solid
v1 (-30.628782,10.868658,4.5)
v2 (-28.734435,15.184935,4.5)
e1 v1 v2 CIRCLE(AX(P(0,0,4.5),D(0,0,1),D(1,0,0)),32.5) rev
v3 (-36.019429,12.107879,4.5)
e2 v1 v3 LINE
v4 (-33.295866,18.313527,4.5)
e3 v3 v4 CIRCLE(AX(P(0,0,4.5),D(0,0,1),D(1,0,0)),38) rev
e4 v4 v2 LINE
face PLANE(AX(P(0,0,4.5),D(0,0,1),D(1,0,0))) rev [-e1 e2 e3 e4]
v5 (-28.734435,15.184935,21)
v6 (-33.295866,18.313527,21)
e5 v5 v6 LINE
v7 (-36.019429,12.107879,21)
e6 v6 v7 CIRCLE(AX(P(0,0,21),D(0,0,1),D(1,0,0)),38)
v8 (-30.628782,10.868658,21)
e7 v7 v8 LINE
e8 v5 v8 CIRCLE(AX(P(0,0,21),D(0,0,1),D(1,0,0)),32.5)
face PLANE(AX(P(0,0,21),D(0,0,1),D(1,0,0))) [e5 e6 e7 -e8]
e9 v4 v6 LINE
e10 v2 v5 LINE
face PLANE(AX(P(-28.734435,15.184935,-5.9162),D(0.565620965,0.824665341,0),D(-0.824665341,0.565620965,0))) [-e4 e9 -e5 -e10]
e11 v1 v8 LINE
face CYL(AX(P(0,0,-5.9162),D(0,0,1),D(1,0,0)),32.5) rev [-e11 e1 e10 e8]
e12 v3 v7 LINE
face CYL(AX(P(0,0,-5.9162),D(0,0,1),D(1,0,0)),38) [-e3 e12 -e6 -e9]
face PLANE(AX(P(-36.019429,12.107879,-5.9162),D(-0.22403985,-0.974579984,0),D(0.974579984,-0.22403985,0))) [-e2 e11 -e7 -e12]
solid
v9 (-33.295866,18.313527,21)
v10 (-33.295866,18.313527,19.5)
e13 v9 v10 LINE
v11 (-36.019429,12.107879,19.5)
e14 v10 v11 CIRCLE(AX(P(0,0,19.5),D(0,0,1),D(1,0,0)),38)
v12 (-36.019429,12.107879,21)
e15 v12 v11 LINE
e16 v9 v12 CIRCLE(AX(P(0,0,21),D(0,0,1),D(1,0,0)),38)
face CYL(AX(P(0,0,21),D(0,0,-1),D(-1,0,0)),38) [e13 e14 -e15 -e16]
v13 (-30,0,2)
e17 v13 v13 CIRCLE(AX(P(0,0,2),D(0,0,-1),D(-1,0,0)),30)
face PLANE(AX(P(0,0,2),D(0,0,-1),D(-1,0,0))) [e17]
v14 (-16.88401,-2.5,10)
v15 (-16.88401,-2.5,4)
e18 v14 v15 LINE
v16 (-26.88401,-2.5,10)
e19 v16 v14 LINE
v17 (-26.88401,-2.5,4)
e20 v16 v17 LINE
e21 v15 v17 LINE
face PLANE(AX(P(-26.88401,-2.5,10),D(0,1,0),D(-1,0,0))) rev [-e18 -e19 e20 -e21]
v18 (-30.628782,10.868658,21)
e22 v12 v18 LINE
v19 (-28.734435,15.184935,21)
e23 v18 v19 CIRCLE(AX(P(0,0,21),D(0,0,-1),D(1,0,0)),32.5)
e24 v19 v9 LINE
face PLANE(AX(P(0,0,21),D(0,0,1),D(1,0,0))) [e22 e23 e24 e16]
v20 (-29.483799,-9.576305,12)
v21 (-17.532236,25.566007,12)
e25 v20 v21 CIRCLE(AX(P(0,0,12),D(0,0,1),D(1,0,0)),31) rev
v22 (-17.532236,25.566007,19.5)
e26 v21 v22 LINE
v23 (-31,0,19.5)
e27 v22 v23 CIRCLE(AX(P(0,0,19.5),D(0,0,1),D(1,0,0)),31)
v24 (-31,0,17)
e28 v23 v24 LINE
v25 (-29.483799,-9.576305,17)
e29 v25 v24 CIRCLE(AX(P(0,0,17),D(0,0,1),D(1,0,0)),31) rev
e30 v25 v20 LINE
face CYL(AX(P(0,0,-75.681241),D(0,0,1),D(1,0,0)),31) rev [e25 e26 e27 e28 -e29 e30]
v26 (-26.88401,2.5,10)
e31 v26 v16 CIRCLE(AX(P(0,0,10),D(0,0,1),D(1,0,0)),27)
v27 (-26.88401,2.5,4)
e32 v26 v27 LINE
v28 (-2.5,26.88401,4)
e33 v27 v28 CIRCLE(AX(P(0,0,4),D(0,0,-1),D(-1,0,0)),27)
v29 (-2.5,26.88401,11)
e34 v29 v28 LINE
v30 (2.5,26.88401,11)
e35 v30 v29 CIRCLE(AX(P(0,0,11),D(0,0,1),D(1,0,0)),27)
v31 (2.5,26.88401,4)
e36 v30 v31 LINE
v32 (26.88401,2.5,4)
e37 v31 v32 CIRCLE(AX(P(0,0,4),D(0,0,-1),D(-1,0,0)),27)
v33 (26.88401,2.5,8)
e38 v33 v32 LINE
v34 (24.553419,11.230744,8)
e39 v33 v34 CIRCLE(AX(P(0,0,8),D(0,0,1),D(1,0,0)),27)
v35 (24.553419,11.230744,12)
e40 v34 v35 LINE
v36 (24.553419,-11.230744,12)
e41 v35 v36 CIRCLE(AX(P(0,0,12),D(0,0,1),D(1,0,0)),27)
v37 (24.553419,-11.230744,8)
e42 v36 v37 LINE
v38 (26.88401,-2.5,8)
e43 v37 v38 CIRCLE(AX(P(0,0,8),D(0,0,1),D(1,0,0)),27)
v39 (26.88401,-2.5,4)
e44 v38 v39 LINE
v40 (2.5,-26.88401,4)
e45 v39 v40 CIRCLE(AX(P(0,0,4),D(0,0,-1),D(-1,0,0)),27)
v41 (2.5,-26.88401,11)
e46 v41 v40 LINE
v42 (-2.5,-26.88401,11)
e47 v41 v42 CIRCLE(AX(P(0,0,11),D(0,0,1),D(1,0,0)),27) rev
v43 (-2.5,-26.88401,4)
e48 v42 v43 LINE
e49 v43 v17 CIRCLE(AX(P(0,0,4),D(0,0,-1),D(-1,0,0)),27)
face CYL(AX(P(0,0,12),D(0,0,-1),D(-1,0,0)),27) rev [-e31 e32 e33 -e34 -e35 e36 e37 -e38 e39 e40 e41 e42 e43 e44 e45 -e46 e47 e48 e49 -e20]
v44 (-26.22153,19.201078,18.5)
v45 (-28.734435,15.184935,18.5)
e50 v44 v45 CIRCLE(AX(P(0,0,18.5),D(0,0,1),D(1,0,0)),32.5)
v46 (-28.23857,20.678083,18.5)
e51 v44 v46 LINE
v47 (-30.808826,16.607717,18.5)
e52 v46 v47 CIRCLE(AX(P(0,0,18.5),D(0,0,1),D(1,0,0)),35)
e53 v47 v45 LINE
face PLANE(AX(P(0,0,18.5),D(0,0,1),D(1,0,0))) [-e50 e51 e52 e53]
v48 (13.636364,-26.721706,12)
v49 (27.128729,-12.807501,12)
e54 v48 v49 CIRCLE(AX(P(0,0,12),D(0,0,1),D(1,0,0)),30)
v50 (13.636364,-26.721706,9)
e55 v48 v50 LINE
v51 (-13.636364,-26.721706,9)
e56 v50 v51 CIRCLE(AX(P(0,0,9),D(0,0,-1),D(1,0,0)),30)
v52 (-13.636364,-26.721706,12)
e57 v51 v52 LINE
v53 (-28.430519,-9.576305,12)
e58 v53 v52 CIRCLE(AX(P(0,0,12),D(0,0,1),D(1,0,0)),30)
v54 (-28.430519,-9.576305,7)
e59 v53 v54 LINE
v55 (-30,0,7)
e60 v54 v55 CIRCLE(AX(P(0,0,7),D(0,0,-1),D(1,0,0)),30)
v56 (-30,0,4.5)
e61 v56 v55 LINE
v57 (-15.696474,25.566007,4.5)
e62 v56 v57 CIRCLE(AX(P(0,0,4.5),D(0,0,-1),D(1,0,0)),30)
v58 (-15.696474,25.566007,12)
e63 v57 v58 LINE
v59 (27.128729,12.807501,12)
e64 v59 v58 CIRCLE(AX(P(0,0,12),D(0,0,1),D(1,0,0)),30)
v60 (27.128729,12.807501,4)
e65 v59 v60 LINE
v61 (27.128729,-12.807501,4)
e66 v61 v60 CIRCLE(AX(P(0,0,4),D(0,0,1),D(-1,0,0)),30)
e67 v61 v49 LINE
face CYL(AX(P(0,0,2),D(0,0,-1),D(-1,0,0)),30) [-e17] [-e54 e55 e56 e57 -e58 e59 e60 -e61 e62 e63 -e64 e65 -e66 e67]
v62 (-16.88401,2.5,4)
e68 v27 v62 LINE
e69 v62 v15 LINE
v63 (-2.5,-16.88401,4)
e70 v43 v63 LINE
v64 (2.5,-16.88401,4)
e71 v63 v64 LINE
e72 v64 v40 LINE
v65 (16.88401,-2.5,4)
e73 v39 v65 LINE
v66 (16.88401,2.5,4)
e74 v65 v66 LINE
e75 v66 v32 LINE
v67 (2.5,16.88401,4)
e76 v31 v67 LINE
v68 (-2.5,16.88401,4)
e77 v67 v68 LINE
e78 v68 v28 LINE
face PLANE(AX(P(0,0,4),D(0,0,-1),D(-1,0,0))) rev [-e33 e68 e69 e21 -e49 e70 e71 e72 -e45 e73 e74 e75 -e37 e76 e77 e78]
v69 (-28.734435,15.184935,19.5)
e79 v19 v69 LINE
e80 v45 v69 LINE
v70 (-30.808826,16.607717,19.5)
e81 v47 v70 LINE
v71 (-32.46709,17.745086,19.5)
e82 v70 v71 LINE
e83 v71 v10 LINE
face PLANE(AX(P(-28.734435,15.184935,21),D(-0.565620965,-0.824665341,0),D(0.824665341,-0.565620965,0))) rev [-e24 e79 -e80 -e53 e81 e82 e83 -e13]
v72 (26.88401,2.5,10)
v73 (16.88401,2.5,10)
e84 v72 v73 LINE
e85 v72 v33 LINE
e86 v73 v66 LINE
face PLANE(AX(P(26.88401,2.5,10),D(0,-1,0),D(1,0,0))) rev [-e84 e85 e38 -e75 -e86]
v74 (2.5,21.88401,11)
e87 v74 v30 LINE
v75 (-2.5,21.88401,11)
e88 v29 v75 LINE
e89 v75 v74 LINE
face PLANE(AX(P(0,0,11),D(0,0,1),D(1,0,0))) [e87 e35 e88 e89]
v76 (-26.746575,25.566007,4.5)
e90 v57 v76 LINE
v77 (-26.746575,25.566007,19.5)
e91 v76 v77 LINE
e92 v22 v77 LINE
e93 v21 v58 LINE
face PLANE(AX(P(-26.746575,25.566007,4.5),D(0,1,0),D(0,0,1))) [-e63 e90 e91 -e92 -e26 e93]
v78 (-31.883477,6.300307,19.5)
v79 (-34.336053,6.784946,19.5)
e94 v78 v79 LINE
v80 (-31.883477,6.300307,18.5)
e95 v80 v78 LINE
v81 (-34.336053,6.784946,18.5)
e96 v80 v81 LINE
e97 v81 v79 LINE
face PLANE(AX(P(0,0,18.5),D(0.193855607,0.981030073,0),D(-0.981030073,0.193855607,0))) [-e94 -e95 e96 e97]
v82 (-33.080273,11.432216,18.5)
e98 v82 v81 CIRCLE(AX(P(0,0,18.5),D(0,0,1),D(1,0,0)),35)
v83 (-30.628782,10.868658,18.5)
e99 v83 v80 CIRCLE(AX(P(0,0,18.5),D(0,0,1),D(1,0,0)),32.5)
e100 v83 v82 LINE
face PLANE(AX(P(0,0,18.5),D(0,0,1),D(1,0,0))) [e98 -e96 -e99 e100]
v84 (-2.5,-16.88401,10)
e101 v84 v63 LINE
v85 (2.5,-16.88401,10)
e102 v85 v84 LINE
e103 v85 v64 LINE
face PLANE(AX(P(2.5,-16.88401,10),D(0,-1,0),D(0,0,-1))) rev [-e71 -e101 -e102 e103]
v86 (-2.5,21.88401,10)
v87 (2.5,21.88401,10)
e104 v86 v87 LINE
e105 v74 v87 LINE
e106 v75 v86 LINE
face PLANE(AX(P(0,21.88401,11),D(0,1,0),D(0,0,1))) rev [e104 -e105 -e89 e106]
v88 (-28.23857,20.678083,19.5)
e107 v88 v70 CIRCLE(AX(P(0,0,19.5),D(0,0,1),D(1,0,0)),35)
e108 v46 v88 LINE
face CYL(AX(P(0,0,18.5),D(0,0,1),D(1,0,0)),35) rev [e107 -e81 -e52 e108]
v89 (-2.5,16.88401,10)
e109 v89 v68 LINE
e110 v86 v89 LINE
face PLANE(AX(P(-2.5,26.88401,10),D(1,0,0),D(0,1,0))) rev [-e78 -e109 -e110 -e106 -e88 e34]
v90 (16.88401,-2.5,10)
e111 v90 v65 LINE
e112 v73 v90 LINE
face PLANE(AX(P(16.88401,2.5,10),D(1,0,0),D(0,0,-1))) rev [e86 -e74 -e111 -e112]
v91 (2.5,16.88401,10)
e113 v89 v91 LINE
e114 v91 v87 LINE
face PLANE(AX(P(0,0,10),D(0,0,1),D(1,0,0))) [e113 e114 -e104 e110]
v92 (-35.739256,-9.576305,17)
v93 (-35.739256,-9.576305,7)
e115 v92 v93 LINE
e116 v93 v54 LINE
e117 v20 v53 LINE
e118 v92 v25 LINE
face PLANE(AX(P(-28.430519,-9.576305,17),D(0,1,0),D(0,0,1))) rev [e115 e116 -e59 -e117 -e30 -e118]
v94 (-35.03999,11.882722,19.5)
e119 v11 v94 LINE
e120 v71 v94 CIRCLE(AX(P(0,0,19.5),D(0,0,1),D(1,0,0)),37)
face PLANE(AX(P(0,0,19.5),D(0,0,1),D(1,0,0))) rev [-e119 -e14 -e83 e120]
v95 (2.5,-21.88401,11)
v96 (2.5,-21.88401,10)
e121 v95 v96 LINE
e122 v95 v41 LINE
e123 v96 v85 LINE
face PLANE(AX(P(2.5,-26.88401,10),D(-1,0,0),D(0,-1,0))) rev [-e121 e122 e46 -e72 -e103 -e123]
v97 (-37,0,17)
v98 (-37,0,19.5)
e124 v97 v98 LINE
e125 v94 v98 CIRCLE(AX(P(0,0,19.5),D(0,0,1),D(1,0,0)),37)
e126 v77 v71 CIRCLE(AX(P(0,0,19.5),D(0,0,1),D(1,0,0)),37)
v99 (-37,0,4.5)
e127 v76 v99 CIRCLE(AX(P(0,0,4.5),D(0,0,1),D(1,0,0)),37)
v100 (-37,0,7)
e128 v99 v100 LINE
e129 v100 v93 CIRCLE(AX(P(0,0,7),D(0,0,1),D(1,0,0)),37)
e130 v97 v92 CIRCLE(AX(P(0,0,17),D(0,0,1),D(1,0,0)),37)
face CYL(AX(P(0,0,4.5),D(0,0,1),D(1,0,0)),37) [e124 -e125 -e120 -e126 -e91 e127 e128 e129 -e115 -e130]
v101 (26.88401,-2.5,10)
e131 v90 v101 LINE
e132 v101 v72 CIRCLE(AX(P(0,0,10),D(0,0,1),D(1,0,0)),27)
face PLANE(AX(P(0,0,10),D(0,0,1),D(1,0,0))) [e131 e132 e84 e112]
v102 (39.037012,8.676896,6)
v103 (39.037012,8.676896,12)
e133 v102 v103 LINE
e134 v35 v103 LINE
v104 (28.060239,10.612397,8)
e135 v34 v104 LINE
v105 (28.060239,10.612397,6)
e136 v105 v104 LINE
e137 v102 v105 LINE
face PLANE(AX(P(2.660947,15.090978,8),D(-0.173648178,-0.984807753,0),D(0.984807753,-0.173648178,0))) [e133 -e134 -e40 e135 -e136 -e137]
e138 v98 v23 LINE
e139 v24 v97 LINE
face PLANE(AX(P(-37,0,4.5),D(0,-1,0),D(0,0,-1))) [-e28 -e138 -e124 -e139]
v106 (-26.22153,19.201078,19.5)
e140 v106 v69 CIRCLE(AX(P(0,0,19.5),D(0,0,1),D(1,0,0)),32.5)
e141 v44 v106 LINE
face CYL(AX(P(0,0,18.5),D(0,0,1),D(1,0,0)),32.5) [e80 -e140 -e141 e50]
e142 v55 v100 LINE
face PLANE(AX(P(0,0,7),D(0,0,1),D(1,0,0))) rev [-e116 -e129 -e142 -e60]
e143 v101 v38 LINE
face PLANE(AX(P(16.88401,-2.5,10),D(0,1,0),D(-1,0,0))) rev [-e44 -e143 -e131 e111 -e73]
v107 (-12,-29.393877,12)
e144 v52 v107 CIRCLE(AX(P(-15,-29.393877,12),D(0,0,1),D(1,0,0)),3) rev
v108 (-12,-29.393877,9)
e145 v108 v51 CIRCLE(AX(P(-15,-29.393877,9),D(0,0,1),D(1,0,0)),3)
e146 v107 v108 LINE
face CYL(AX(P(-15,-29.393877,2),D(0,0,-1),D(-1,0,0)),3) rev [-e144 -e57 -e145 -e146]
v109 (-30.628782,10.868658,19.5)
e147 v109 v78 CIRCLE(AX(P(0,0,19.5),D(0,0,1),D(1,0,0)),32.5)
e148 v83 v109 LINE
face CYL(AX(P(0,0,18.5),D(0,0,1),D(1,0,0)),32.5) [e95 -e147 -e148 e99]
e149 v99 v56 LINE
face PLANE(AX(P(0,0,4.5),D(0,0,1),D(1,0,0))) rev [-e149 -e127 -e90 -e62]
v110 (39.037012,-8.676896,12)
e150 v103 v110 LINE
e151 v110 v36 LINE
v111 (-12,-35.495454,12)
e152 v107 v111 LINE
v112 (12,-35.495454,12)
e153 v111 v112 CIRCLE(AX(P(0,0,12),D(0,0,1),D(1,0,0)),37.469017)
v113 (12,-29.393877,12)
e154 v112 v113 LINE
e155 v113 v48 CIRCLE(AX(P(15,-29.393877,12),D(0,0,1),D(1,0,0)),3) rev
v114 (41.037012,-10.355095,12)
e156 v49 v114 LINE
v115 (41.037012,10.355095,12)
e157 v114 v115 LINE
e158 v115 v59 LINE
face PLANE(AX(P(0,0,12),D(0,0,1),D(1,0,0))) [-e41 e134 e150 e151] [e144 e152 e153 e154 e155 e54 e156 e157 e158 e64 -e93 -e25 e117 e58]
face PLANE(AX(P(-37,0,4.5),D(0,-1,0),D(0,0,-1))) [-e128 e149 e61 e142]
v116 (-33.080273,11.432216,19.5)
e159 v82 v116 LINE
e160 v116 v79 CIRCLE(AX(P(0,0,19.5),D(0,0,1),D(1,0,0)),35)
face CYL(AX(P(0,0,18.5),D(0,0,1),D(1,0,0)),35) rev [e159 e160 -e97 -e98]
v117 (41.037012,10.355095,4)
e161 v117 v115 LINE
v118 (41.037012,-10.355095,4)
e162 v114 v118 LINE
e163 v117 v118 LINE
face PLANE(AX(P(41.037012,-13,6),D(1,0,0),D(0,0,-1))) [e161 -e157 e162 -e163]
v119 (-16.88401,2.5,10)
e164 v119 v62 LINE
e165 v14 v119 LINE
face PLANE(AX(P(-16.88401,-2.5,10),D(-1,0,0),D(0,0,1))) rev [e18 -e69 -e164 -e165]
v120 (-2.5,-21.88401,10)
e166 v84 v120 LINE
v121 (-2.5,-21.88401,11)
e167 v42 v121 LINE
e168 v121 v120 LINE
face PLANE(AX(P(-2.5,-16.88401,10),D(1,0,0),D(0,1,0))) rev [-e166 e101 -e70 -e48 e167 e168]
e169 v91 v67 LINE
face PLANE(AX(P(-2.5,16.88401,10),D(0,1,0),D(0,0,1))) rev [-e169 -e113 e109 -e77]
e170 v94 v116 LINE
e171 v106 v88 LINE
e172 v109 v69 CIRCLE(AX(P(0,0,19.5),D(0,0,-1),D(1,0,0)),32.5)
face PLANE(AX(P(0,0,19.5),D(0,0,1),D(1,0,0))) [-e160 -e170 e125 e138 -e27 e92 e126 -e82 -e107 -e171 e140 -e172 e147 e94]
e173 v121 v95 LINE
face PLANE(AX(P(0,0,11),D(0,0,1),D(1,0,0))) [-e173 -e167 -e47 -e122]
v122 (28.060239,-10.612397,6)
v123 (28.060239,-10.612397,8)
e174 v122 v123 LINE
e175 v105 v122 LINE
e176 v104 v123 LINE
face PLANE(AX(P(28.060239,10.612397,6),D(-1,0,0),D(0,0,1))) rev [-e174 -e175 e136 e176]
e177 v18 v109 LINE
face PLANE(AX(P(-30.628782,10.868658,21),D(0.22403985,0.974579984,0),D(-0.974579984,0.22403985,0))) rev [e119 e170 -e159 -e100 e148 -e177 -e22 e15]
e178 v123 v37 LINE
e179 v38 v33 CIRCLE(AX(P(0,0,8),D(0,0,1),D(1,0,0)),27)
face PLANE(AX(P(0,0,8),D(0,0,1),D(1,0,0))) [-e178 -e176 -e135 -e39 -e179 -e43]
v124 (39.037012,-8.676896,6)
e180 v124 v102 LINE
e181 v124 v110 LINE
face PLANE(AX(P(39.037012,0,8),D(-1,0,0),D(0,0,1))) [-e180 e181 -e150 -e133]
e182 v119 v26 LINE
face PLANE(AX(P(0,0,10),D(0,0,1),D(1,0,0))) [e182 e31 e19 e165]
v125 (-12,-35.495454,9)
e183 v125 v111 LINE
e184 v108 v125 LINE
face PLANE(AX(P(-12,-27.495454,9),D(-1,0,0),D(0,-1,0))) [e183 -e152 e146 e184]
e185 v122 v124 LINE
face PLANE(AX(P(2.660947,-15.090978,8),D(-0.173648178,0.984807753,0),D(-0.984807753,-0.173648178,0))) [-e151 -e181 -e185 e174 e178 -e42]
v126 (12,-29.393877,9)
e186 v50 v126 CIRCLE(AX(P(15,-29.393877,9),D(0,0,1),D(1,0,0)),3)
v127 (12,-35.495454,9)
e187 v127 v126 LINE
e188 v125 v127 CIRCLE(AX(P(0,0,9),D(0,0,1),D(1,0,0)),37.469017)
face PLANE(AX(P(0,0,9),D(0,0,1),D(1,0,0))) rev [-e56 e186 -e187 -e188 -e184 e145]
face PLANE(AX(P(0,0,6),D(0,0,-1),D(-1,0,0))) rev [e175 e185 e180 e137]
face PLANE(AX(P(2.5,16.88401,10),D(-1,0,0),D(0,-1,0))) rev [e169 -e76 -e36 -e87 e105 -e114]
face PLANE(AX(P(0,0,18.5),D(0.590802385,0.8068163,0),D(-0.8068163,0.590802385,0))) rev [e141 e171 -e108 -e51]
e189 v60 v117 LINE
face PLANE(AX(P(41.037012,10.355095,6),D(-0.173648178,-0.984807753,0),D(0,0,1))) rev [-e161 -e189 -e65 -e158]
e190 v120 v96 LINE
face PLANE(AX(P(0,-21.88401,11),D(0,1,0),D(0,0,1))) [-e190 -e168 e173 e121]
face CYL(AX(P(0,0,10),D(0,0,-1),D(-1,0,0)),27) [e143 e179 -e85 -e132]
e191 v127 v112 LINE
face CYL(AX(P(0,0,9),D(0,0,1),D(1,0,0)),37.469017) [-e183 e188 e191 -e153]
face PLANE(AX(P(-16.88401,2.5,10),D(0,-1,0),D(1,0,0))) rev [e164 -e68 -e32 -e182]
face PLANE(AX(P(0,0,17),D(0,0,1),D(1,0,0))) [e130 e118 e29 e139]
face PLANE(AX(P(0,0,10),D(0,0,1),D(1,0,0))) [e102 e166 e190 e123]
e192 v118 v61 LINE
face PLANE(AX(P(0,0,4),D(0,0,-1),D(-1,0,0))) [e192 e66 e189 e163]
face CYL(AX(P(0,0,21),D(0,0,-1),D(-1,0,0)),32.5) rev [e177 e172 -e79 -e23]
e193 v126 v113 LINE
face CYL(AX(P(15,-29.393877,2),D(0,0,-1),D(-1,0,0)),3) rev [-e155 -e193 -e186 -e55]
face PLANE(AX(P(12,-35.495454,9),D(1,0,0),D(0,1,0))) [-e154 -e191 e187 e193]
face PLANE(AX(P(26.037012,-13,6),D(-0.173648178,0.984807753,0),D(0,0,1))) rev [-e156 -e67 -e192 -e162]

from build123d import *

# Parameters (mm, degrees)
SKETCH_1_R           = 30
EXTRUDE_1_DEPTH      = 2
SKETCH_5_R           = 30
SKETCH_5_R_2         = 27
EXTRUDE_2_DEPTH      = 10
EXTRUDE_START        = -3
EXTRUDE_3_DEPTH      = 3
FILLET_2_R           = 3
FILLET_3_R           = 3
EXTRUDE_START_2      = -6
EXTRUDE_4_DEPTH      = 6
EXTRUDE_6_DEPTH      = 7.5
SKETCH_14_R          = 31
CUT_EXTRUDE_3_DEPTH  = 7.5
CHAMFER_4_SIZE       = 2.644904711
CHAMFER_4_SIZE_2     = 15
CHAMFER_5_SIZE       = 2.644904711
CHAMFER_5_SIZE_2     = 15
CUT_EXTRUDE_START    = -4
CUT_EXTRUDE_6_DEPTH  = 4
EXTRUDE_10_DEPTH     = 5
CUT_EXTRUDE_START_2  = 6
CUT_EXTRUDE_7_DEPTH  = 6
EXTRUDE_11_DEPTH     = 8
EXTRUDE_12_DEPTH     = 1
EXTRUDE_13_DEPTH     = 1.5
EXTRUDE_14_DEPTH     = 16.5
CUT_EXTRUDE_START_3  = -1
CUT_EXTRUDE_8_DEPTH  = 1
EXTRUDE_START_3      = 2
EXTRUDE_15_DEPTH     = 2
CUT_EXTRUDE_9_DEPTH  = 2
SKETCH_33_R          = 30
CUT_EXTRUDE_10_DEPTH = 2
SKETCH_34_R          = 30
EXTRUDE_16_DEPTH     = 2


with BuildPart() as part:
    # 草图1 → 凸台-拉伸1 (new body)
    with BuildSketch(Plane.XY):
        Circle(SKETCH_1_R)
    extrude(amount=EXTRUDE_1_DEPTH)

    # 草图5 → 凸台-拉伸2 (add)
    with BuildSketch(Plane.XY.offset(2)):
        Circle(SKETCH_5_R)
        Circle(SKETCH_5_R_2, mode=Mode.SUBTRACT)
    extrude(amount=EXTRUDE_2_DEPTH)

    # 草图6 → 凸台-拉伸3 (add)
    with BuildSketch(Plane.XY.offset(12).offset(EXTRUDE_START)):
        with BuildLine():
            Line((-12, -27.49545417), (-12, -35.49545417))
            ThreePointArc((-12, -35.49545417), (0, -37.469017424), (12, -35.49545417))
            Line((12, -35.49545417), (12, -27.49545417))
            ThreePointArc((12, -27.49545417), (0, -30), (-12, -27.49545417))
        make_face()
    extrude(amount=EXTRUDE_3_DEPTH)

    # 圆角2
    fillet_2_edges = [part.edges().sort_by_distance(p)[0] for p in [
        (-12, -27.49545417, 10.5),
    ]]
    fillet(fillet_2_edges, radius=FILLET_2_R)

    # 圆角3
    fillet_3_edges = [part.edges().sort_by_distance(p)[0] for p in [
        (12, -27.49545417, 10.5),
    ]]
    fillet(fillet_3_edges, radius=FILLET_3_R)

    # 草图8 → 凸台-拉伸4 (add)
    with BuildSketch(Plane.XY.offset(12).offset(EXTRUDE_START_2)):
        with BuildLine():
            Line((27.037011669, -13), (41.037011669, -13))
            Line((41.037011669, -13), (41.037011669, 13))
            Line((41.037011669, 13), (27.037011669, 13))
            ThreePointArc((27.037011669, 13), (30, 0), (27.037011669, -13))
        make_face()
    extrude(amount=EXTRUDE_4_DEPTH)

    # 草图13 → 凸台-拉伸6 (add, symmetric)
    with BuildSketch(Plane.XY.offset(12)):
        with BuildLine():
            Line((-26.746575291, 25.566006927), (-15.696473801, 25.566006927))
            ThreePointArc((-15.696473801, 25.566006927), (-26.181044804, 14.647624141), (-30, 0))
            Line((-30, 0), (-37, 0))
            ThreePointArc((-37, 0), (-34.341107188, 13.772739637), (-26.746575291, 25.566006927))
        make_face()
    extrude(amount=EXTRUDE_6_DEPTH, both=True)

    # 草图14 → 切除-拉伸3 (cut)
    with BuildSketch(Plane.XY.offset(19.5)):
        Circle(SKETCH_14_R)
    extrude(amount=-CUT_EXTRUDE_3_DEPTH, mode=Mode.SUBTRACT)

    # 倒角4
    # the kernel refuses this chamfer: 15, 2.644904711 mm, written as the material it takes off along each edge
    with BuildSketch(Plane(origin=(41.037011669, 13, -32.978081946), x_dir=(0.21013876076743002, -0.9776715712462589, 0), z_dir=(0, 0, 1))) as chamfer_4_piece_1_section:
        Polygon((CHAMFER_4_SIZE * 0.977671571108, -CHAMFER_4_SIZE * 0.210138760738), (-CHAMFER_4_SIZE_2 * 0.210138760767, -CHAMFER_4_SIZE_2 * 0.977671571246), (0, 0), align=None)
    chamfer_4_piece_1 = extrude(amount=83.956163893, mode=Mode.PRIVATE)
    chamfer_4_piece_1 = chamfer_4_piece_1 - Plane(origin=(0, 0, 9), x_dir=(1, 0, 0), z_dir=(0, 0, -1)) * Cylinder(30, 227, mode=Mode.PRIVATE)
    add(chamfer_4_piece_1, mode=Mode.SUBTRACT)

    # 倒角5
    # the kernel refuses this chamfer: 15, 2.644904711 mm, written as the material it takes off along each edge
    with BuildSketch(Plane(origin=(41.037011669, -13, -32.978081946), x_dir=(0.21013876076743015, 0.9776715712462588, 0), z_dir=(0, 0, 1))) as chamfer_5_piece_1_section:
        Polygon((CHAMFER_5_SIZE * 0.977671571108, CHAMFER_5_SIZE * 0.210138760738), (-CHAMFER_5_SIZE_2 * 0.210138760767, CHAMFER_5_SIZE_2 * 0.977671571246), (0, 0), align=None)
    chamfer_5_piece_1 = extrude(amount=83.956163893, mode=Mode.PRIVATE)
    chamfer_5_piece_1 = chamfer_5_piece_1 - Plane(origin=(0, 0, 9), x_dir=(1, 0, 0), z_dir=(0, 0, -1)) * Cylinder(30, 227, mode=Mode.PRIVATE)
    add(chamfer_5_piece_1, mode=Mode.SUBTRACT)

    # 草图16 → 切除-拉伸6 (cut)
    with BuildSketch(Plane.XY.offset(12).offset(CUT_EXTRUDE_START)):
        with BuildLine():
            ThreePointArc((27, 0), (26.381265258, 5.747072595), (24.553419007, 11.230744191))
            Line((24.553419007, 11.230744191), (18.452318659, 12.306532794))
            Line((18.452318659, 12.306532794), (21.994315515, -11.681983183))
            Line((21.994315515, -11.681983183), (24.553419007, -11.230744191))
            ThreePointArc((24.553419007, -11.230744191), (26.381265258, -5.747072595), (27, 0))
        make_face()
        with BuildLine():
            Line((18.452318659, 12.306532794), (24.553419007, 11.230744191))
            ThreePointArc((24.553419007, 11.230744191), (-27, 0), (24.553419007, -11.230744191))
            Line((24.553419007, -11.230744191), (21.994315515, -11.681983183))
            Line((21.994315515, -11.681983183), (18.452318659, 12.306532794))
        make_face()
        with BuildLine():
            Line((39.037011669, 8.676896027), (27.995789134, 10.62376146))
            Line((27.995789134, 10.62376146), (24.553419007, 11.230744191))
            ThreePointArc((24.553419007, 11.230744191), (26.381265258, 5.747072595), (27, 0))
            ThreePointArc((27, 0), (26.381265258, -5.747072595), (24.553419007, -11.230744191))
            Line((24.553419007, -11.230744191), (39.037011669, -8.676896027))
            Line((39.037011669, -8.676896027), (39.037011669, 8.676896027))
        make_face()
    extrude(amount=CUT_EXTRUDE_6_DEPTH, mode=Mode.SUBTRACT)

    # 草图17 → 凸台-拉伸10 (add, symmetric)
    with BuildSketch(Plane.XY.offset(12)):
        with BuildLine():
            Line((-28.430518618, -9.576304669), (-35.739255573, -9.576304669))
            ThreePointArc((-35.739255573, -9.576304669), (-36.683459871, -4.829469112), (-37, 0))
            Line((-37, 0), (-31, 0))
            Line((-31, 0), (-30, 0))
            ThreePointArc((-30, 0), (-29.605029628, -4.852032639), (-28.430518618, -9.576304669))
        make_face()
    extrude(amount=EXTRUDE_10_DEPTH, both=True)

    # 草图18 → 切除-拉伸7 (cut)
    with BuildSketch(Plane.XY.offset(12).offset(CUT_EXTRUDE_START_2)):
        with BuildLine():
            ThreePointArc((-31, 0), (-30.618603506, -4.847795306), (-29.483798753, -9.576304669))
            Line((-29.483798753, -9.576304669), (-28.430518618, -9.576304669))
            ThreePointArc((-28.430518618, -9.576304669), (-29.605029628, -4.852032639), (-30, 0))
            Line((-30, 0), (-31, 0))
        make_face()
    extrude(amount=-CUT_EXTRUDE_7_DEPTH, mode=Mode.SUBTRACT)

    # 草图19 → 凸台-拉伸11 (add)
    with BuildSketch(Plane.XY.offset(2)):
        with BuildLine():
            Line((-2.5, 26.884010118), (-2.5, 16.884010118))
            Line((-2.5, 16.884010118), (2.5, 16.884010118))
            Line((2.5, 16.884010118), (2.5, 26.884010118))
            ThreePointArc((2.5, 26.884010118), (0, 27), (-2.5, 26.884010118))
        make_face()
        with BuildLine():
            Line((26.884010118, 2.5), (16.884010118, 2.5))
            Line((16.884010118, 2.5), (16.884010118, -2.5))
            Line((16.884010118, -2.5), (26.884010118, -2.5))
            ThreePointArc((26.884010118, -2.5), (27, 0), (26.884010118, 2.5))
        make_face()
        with BuildLine():
            Line((2.5, -26.884010118), (2.5, -16.884010118))
            Line((2.5, -16.884010118), (-2.5, -16.884010118))
            Line((-2.5, -16.884010118), (-2.5, -26.884010118))
            ThreePointArc((-2.5, -26.884010118), (0, -27), (2.5, -26.884010118))
        make_face()
        with BuildLine():
            Line((-26.884010118, -2.5), (-16.884010118, -2.5))
            Line((-16.884010118, -2.5), (-16.884010118, 2.5))
            Line((-16.884010118, 2.5), (-26.884010118, 2.5))
            ThreePointArc((-26.884010118, 2.5), (-27, 0), (-26.884010118, -2.5))
        make_face()
    extrude(amount=EXTRUDE_11_DEPTH)

    # 草图20 → 凸台-拉伸12 (add)
    with BuildSketch(Plane.XY.offset(10)):
        with BuildLine():
            ThreePointArc((2.5, -26.884010118), (0, -27), (-2.5, -26.884010118))
            Line((-2.5, -26.884010118), (-2.5, -21.884010118))
            Line((-2.5, -21.884010118), (2.5, -21.884010118))
            Line((2.5, -21.884010118), (2.5, -26.884010118))
        make_face()
        with BuildLine():
            ThreePointArc((2.5, 26.884010118), (0, 27), (-2.5, 26.884010118))
            Line((-2.5, 26.884010118), (-2.5, 21.884010118))
            Line((-2.5, 21.884010118), (2.5, 21.884010118))
            Line((2.5, 21.884010118), (2.5, 26.884010118))
        make_face()
    extrude(amount=EXTRUDE_12_DEPTH)

    # 草图21 → 凸台-拉伸13 (add)
    with BuildSketch(Plane.XY.offset(19.5)):
        with BuildLine():
            Line((-28.734434843, 15.184935109), (-33.295866493, 18.31352709))
            ThreePointArc((-33.295866493, 18.31352709), (-34.796265088, 15.271540063), (-36.019428995, 12.10787904))
            Line((-36.019428995, 12.10787904), (-30.628781703, 10.868658214))
            ThreePointArc((-30.628781703, 10.868658214), (-29.759963562, 13.061185581), (-28.734434843, 15.184935109))
        make_face()
    extrude(amount=EXTRUDE_13_DEPTH)

    # 草图28 → 切除-拉伸8 (cut)
    with BuildSketch(Plane.XY.offset(19.5).offset(CUT_EXTRUDE_START_3)):
        with BuildLine():
            Line((-34.336052546, 6.784946244), (-31.883477364, 6.300307226))
            ThreePointArc((-31.883477364, 6.300307226), (-31.339481347, 8.60737526), (-30.628781703, 10.868658214))
            Line((-30.628781703, 10.868658214), (-33.080272788, 11.432215546))
            ThreePointArc((-33.080272788, 11.432215546), (-33.788156333, 9.130196691), (-34.336052546, 6.784946244))
        make_face()
        with BuildLine():
            ThreePointArc((-28.734434843, 15.184935109), (-27.551258788, 17.238855508), (-26.22152974, 19.201077524))
            Line((-26.22152974, 19.201077524), (-28.23857049, 20.678083487))
            ThreePointArc((-28.23857049, 20.678083487), (-29.593761465, 18.687142166), (-30.80882562, 16.607717))
            Line((-30.80882562, 16.607717), (-28.734434843, 15.184935109))
        make_face()
    extrude(amount=CUT_EXTRUDE_8_DEPTH, mode=Mode.SUBTRACT)

    # 草图31 → 凸台-拉伸15 (add)
    with BuildSketch(Plane(origin=(0, 0, 6), x_dir=(-1, 0, 0), z_dir=(0, 0, -1)).offset(EXTRUDE_START_3)):
        with BuildLine():
            Line((-41.037011669, 10.355095289), (-41.037011669, -10.355095289))
            Line((-41.037011669, -10.355095289), (-27.128728731, -12.807500827))
            ThreePointArc((-27.128728731, -12.807500827), (-30, 0), (-27.128728731, 12.807500827))
            Line((-27.128728731, 12.807500827), (-41.037011669, 10.355095289))
        make_face()
    extrude(amount=-EXTRUDE_15_DEPTH)

    # 草图32 → 切除-拉伸9 (cut)
    with BuildSketch(Plane.XY.offset(8)):
        Polygon((39.037011669, -8.676896027), (28.060239243, -10.612397167), (28.060239243, 10.612397167), (39.037011669, 8.676896027), align=None)
    extrude(amount=-CUT_EXTRUDE_9_DEPTH, mode=Mode.SUBTRACT)

    # 草图33 → 切除-拉伸10 (cut)
    with BuildSketch(Plane(origin=(0, 0, 0), x_dir=(-1, 0, 0), z_dir=(0, 0, -1))):
        Circle(SKETCH_33_R)
    extrude(amount=-CUT_EXTRUDE_10_DEPTH, mode=Mode.SUBTRACT)

    # 草图34 → 凸台-拉伸16 (add)
    with BuildSketch(Plane(origin=(0, 0, 2), x_dir=(-1, 0, 0), z_dir=(0, 0, -1))):
        Circle(SKETCH_34_R)
    extrude(amount=-EXTRUDE_16_DEPTH)


with BuildPart() as body_2:
    # 草图26 → 凸台-拉伸14 (new body)
    with BuildSketch(Plane.XY.offset(21)):
        with BuildLine():
            Line((-28.734434843, 15.184935109), (-33.295866493, 18.31352709))
            ThreePointArc((-33.295866493, 18.31352709), (-34.796265088, 15.271540063), (-36.019428995, 12.10787904))
            Line((-36.019428995, 12.10787904), (-30.628781703, 10.868658214))
            ThreePointArc((-30.628781703, 10.868658214), (-29.759963562, 13.061185581), (-28.734434843, 15.184935109))
        make_face()
    extrude(amount=-EXTRUDE_14_DEPTH)


solid = Compound([part.part, body_2.part])
